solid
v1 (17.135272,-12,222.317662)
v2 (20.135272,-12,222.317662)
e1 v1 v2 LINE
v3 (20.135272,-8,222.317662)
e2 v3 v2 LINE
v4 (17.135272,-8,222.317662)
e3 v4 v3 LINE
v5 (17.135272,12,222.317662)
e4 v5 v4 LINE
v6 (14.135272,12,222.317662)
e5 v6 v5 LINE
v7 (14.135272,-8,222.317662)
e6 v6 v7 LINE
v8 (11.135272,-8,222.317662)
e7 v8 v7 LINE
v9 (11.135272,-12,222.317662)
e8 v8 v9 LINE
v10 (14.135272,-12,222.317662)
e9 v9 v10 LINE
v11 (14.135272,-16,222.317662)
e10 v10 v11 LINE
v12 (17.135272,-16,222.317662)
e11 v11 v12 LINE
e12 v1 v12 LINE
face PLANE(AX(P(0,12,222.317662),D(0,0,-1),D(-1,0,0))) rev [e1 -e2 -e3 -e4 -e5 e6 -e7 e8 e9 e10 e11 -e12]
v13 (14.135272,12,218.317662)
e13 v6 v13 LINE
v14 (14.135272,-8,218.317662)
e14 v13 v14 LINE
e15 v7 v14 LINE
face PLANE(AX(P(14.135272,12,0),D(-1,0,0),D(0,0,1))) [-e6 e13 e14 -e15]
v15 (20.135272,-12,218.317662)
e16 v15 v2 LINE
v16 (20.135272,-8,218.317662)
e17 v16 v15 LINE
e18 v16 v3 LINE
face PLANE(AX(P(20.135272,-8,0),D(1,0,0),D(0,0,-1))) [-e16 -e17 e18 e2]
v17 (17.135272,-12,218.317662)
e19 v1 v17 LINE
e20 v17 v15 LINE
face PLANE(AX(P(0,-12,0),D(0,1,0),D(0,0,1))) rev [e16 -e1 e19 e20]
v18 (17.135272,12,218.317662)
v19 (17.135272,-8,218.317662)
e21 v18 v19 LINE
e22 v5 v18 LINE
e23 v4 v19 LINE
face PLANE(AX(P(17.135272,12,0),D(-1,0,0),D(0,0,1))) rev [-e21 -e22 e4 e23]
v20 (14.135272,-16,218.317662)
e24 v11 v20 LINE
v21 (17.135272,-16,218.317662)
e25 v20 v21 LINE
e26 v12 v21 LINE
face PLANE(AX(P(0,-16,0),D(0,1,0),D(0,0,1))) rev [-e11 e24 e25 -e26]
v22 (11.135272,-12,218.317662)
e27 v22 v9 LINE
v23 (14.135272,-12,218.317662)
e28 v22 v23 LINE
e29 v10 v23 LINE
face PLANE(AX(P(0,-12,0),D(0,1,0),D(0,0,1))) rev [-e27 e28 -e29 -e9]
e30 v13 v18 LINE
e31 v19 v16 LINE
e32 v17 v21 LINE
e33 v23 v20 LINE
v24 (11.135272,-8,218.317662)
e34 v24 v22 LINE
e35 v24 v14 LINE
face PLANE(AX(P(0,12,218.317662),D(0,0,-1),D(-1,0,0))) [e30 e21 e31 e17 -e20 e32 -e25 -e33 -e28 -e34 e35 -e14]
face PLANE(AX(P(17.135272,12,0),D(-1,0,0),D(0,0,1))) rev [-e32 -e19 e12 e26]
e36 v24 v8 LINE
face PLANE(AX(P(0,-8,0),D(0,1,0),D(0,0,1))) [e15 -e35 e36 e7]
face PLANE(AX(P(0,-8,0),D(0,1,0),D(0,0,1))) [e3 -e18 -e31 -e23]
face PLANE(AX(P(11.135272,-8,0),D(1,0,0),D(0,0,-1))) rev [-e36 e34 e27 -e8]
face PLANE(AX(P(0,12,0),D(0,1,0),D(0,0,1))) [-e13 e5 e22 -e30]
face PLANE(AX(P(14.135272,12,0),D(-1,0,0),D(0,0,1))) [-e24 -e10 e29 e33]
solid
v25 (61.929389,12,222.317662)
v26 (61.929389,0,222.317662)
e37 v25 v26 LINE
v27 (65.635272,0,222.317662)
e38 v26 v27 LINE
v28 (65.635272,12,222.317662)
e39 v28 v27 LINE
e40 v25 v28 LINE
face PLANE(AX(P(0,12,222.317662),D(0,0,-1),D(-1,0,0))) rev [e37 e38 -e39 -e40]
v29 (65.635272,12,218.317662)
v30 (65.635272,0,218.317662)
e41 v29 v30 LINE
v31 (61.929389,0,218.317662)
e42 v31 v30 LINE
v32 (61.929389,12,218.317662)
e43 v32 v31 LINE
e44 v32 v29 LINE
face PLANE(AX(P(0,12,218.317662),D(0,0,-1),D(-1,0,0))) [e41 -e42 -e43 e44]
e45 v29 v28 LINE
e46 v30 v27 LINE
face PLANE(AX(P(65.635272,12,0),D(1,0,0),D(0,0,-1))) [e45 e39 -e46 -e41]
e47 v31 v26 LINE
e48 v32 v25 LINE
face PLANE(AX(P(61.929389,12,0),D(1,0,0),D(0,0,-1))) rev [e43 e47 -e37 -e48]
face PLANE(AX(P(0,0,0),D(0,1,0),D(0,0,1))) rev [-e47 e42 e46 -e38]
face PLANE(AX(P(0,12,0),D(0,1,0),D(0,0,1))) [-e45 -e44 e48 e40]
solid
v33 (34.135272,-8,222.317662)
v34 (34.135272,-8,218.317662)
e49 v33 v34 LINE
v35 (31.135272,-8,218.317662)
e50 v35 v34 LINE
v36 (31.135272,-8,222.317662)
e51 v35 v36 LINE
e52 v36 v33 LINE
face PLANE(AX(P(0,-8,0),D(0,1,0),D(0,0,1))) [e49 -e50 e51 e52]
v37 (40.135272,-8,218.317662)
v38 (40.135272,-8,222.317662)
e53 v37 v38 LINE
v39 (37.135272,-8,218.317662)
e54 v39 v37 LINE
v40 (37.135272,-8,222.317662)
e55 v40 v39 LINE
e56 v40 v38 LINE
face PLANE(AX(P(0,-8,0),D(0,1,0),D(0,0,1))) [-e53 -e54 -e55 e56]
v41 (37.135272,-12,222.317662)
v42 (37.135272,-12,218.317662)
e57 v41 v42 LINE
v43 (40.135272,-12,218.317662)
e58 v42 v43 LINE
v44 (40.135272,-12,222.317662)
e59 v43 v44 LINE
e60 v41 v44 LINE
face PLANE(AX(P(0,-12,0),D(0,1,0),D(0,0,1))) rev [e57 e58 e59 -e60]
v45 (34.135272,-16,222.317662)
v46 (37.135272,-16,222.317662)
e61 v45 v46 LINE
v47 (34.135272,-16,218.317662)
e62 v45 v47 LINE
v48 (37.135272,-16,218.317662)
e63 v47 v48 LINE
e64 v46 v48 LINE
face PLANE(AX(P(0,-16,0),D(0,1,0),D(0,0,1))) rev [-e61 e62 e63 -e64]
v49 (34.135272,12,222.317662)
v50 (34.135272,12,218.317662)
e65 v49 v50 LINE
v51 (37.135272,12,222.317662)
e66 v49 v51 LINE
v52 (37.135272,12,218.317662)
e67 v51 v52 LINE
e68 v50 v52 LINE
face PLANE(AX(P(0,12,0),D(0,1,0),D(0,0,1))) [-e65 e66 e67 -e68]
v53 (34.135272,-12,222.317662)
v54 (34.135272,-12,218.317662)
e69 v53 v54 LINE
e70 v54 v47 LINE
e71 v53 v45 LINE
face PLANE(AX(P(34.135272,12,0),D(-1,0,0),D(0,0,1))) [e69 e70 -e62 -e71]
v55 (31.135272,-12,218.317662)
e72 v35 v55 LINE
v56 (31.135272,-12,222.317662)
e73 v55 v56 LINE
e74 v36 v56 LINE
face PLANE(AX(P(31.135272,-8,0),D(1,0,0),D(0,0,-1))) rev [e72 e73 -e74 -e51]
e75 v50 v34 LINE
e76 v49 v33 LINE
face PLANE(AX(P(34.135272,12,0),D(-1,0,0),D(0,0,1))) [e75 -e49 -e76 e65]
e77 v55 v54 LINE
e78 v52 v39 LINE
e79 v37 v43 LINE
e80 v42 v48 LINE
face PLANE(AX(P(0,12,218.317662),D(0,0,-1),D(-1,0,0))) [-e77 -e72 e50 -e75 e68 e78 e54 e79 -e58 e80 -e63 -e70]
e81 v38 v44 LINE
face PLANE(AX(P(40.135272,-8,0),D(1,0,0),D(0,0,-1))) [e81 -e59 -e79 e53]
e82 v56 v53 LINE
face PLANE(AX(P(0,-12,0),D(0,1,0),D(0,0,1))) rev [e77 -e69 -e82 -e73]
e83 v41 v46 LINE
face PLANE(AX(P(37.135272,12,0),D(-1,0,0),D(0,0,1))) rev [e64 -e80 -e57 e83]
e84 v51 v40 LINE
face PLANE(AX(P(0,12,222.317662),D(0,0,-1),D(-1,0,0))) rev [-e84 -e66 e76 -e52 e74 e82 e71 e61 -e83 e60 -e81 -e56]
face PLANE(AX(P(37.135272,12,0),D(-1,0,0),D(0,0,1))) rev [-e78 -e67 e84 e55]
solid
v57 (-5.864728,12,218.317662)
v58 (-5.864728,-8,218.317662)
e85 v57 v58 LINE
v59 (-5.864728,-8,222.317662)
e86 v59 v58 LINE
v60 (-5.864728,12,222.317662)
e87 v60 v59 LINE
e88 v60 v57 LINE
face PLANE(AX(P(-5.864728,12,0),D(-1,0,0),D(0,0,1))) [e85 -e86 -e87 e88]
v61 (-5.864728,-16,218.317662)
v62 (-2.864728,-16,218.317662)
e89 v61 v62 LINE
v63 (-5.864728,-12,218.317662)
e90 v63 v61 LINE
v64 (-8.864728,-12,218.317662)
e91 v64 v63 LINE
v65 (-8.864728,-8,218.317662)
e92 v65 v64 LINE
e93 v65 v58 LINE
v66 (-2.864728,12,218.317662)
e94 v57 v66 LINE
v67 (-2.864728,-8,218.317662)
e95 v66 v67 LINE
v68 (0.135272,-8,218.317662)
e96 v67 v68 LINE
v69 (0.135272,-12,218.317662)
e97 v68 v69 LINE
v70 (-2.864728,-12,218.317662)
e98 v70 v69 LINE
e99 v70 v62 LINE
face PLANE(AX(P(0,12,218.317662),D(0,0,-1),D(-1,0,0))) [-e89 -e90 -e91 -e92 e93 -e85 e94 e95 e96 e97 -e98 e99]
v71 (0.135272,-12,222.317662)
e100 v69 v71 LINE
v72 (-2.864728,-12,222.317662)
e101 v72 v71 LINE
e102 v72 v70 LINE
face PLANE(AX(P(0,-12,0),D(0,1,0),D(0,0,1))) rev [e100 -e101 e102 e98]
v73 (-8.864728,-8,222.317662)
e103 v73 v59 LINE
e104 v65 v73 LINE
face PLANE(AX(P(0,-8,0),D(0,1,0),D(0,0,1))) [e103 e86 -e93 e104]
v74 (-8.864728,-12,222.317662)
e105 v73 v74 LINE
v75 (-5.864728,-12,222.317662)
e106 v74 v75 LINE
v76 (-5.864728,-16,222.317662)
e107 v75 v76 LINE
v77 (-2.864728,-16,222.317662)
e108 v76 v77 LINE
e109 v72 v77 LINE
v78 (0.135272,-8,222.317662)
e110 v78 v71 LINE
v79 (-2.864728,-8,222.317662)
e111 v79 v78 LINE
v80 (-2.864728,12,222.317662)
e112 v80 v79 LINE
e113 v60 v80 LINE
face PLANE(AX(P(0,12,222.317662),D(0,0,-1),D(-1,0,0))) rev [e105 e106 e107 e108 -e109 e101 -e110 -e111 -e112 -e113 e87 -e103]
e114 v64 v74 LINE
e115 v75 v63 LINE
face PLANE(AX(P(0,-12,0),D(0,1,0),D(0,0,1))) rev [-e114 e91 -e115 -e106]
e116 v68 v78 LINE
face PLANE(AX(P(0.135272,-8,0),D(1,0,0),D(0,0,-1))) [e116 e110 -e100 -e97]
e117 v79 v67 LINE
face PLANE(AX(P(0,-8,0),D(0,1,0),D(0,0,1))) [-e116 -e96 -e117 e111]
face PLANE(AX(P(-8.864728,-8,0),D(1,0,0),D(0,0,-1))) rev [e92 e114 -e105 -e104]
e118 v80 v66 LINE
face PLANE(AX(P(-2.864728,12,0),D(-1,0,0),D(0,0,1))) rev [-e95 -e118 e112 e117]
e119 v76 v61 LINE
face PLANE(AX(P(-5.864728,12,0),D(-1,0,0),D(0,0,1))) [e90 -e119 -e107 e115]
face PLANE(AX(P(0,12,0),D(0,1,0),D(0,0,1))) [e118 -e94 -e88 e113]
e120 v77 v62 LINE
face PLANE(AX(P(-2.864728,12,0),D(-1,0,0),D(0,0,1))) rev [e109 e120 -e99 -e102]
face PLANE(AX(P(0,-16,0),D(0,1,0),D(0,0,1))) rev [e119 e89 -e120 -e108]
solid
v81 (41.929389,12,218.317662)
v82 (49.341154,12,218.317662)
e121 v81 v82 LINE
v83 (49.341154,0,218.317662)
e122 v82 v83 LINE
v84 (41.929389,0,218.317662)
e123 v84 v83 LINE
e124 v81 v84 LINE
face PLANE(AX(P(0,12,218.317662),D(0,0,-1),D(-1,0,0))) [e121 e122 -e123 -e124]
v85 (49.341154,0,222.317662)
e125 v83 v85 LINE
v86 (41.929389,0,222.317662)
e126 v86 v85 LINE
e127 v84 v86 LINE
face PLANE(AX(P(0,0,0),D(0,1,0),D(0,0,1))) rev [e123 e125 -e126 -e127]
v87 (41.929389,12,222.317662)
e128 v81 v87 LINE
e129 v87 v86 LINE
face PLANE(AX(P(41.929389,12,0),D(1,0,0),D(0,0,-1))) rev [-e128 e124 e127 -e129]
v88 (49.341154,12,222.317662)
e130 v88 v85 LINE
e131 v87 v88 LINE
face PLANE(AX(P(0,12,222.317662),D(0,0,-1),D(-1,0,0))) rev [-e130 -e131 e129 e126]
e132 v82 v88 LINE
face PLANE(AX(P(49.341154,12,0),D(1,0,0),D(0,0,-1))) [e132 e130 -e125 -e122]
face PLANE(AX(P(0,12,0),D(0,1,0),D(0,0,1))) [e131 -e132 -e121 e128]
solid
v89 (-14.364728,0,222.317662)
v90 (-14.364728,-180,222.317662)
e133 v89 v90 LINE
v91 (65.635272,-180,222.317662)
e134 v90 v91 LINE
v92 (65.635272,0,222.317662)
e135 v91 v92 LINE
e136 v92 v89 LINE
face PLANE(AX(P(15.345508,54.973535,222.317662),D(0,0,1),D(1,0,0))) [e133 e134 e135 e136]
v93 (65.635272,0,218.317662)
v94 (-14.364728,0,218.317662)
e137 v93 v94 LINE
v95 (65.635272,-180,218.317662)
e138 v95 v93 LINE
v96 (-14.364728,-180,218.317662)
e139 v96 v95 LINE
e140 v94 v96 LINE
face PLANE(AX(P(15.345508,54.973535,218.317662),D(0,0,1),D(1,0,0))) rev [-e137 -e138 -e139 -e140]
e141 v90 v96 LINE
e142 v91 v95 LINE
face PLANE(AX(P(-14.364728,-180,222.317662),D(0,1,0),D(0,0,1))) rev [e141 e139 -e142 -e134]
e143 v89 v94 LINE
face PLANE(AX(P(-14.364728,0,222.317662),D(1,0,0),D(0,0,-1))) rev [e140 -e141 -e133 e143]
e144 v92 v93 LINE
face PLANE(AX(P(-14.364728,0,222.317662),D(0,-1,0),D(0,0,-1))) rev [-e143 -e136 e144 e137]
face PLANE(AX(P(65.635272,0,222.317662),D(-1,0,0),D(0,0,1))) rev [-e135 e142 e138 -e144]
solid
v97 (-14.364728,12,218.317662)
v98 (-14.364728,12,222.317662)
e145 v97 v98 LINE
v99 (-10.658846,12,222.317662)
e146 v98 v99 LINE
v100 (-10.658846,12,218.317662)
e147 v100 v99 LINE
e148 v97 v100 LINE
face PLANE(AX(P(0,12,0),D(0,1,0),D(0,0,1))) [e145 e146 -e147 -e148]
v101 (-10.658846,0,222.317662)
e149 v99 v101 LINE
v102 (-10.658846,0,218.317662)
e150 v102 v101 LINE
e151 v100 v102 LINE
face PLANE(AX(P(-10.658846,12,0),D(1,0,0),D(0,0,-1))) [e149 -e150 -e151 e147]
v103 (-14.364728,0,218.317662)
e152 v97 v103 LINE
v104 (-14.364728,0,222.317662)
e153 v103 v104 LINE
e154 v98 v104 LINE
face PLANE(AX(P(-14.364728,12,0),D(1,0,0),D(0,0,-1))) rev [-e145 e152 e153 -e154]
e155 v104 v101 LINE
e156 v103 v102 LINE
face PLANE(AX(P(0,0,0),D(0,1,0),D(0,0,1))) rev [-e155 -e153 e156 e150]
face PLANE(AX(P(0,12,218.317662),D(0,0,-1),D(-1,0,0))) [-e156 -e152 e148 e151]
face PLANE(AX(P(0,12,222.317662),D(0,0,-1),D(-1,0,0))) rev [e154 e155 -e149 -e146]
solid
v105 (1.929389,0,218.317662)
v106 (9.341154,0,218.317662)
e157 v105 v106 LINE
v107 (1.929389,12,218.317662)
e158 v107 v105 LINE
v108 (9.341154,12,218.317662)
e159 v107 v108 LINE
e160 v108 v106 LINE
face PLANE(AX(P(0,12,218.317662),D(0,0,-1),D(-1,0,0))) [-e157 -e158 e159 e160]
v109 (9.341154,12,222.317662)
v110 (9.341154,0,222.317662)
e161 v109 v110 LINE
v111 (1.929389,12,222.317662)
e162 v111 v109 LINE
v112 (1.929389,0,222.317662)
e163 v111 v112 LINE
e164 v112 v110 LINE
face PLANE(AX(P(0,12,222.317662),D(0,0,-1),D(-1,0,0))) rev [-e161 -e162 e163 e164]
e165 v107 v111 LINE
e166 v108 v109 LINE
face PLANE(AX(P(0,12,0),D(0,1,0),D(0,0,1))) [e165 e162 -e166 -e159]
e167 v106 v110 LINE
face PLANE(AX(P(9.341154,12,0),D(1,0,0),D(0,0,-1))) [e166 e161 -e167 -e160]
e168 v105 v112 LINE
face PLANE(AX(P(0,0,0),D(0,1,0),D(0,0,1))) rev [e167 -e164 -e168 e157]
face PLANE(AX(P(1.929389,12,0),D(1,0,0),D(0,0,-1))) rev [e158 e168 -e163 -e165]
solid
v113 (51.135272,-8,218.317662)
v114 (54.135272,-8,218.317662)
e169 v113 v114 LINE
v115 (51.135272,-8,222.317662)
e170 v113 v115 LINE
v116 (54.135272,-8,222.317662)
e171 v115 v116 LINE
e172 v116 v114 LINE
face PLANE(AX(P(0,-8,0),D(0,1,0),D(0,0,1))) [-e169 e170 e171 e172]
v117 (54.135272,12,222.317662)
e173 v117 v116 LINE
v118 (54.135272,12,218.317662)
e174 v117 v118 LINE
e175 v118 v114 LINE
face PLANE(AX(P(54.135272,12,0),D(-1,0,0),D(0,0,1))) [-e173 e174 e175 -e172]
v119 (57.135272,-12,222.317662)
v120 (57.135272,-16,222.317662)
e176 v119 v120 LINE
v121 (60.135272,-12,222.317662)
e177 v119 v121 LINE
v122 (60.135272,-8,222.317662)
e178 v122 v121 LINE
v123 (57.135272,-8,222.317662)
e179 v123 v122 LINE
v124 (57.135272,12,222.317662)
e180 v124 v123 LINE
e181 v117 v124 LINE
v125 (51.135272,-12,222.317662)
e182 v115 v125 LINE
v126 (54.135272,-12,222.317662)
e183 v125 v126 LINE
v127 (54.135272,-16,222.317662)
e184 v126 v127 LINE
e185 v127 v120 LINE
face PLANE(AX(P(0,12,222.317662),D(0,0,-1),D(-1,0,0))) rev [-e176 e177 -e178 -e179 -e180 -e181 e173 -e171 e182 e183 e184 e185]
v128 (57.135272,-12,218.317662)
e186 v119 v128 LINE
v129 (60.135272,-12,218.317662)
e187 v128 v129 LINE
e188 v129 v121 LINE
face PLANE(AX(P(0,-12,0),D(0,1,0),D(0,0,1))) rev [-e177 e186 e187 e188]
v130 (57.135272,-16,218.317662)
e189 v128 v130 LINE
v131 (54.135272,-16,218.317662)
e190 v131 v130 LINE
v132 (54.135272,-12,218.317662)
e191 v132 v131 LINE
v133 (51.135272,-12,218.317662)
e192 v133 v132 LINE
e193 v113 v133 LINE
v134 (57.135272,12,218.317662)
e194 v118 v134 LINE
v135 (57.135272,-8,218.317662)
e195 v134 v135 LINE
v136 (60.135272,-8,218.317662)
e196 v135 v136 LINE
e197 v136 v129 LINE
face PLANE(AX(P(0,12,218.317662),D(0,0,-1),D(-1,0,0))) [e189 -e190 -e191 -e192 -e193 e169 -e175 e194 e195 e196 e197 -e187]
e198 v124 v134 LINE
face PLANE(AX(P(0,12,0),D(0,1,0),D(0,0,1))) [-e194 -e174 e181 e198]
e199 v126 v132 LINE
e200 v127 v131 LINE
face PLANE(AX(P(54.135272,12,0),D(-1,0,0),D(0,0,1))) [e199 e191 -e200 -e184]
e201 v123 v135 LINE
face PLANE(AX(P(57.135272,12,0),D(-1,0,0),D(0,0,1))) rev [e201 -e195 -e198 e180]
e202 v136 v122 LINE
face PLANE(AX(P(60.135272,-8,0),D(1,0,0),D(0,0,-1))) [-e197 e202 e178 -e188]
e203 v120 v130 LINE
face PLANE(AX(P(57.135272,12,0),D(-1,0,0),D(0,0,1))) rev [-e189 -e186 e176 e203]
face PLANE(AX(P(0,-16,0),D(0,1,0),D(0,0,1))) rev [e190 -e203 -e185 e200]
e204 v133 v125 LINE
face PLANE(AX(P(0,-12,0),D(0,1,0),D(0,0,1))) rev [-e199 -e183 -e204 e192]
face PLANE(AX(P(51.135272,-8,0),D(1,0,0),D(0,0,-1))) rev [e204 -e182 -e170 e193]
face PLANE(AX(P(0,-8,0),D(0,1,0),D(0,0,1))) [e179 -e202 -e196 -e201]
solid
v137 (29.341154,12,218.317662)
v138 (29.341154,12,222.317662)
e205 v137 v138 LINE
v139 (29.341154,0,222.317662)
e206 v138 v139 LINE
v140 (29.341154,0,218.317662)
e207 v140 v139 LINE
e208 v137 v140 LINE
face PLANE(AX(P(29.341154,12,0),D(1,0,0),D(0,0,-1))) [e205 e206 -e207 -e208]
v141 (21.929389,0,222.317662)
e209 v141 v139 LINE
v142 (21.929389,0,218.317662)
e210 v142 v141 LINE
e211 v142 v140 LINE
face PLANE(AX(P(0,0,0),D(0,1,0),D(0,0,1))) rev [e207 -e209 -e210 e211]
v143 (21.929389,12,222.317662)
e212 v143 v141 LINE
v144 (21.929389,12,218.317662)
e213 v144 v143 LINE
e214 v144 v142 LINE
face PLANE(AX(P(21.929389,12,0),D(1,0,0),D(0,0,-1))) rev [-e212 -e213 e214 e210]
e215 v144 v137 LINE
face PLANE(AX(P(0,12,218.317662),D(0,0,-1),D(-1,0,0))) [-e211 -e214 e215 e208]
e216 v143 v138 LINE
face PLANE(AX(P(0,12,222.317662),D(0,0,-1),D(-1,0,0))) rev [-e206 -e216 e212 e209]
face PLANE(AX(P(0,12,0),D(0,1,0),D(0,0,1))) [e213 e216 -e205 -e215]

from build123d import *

# Parameters (mm, degrees)
SKETCH3_W             = 3.705882353
SKETCH3_H             = 4
BOSS_EXTRUDE2_DEPTH   = 12
SKETCH3_W_2           = 3
BOSS_EXTRUDE2_2_DEPTH = 12
SKETCH3_W_3           = 7.411764706
BOSS_EXTRUDE2_3_DEPTH = 12
BOSS_EXTRUDE2_4_DEPTH = 12
BOSS_EXTRUDE2_5_DEPTH = 12
BOSS_EXTRUDE2_6_DEPTH = 12
BOSS_EXTRUDE2_7_DEPTH = 12
BOSS_EXTRUDE2_8_DEPTH = 12
BOSS_EXTRUDE2_9_DEPTH = 12
SKETCH3_6_W           = 3
SKETCH3_6_H           = 4
BOSS_EXTRUDE4_DEPTH   = 16
BOSS_EXTRUDE5_START   = -12
SKETCH3_7_W           = 3
SKETCH3_7_H           = 4
BOSS_EXTRUDE5_DEPTH   = 4
SKETCH4_W             = 80
SKETCH4_H             = 180
BOSS_EXTRUDE6_DEPTH   = 4


with BuildPart() as part:
    # Sketch3 → Boss-Extrude2 (new body)
    with BuildSketch(Plane(origin=(0, 0, 0), x_dir=(1, 0, 0), z_dir=(0, 1, 0))):
        with Locations((-12.511786974, -220.31766228)):
            Rectangle(SKETCH3_W, SKETCH3_H)
    extrude(amount=BOSS_EXTRUDE2_DEPTH)


with BuildPart() as body_2:
    # Sketch3 → Boss-Extrude2 2 (new body)
    with BuildSketch(Plane(origin=(0, 0, 0), x_dir=(1, 0, 0), z_dir=(0, 1, 0))):
        with Locations((-4.36472815, -220.31766228)):
            Rectangle(SKETCH3_W_2, SKETCH3_H)
    extrude(amount=BOSS_EXTRUDE2_2_DEPTH)



with BuildPart() as body_3:
    # Sketch3 → Boss-Extrude2 3 (new body)
    with BuildSketch(Plane(origin=(0, 0, 0), x_dir=(1, 0, 0), z_dir=(0, 1, 0))):
        with Locations((5.63527185, -220.31766228)):
            Rectangle(SKETCH3_W_3, SKETCH3_H)
    extrude(amount=BOSS_EXTRUDE2_3_DEPTH)


with BuildPart() as body_4:
    # Sketch3 → Boss-Extrude2 4 (new body)
    with BuildSketch(Plane(origin=(0, 0, 0), x_dir=(1, 0, 0), z_dir=(0, 1, 0))):
        with Locations((15.63527185, -220.31766228)):
            Rectangle(SKETCH3_W_2, SKETCH3_H)
    extrude(amount=BOSS_EXTRUDE2_4_DEPTH)


with BuildPart() as body_5:
    # Sketch3 → Boss-Extrude2 5 (new body)
    with BuildSketch(Plane(origin=(0, 0, 0), x_dir=(1, 0, 0), z_dir=(0, 1, 0))):
        with Locations((25.63527185, -220.31766228)):
            Rectangle(SKETCH3_W_3, SKETCH3_H)
    extrude(amount=BOSS_EXTRUDE2_5_DEPTH)


with BuildPart() as body_6:
    # Sketch3 → Boss-Extrude2 6 (new body)
    with BuildSketch(Plane(origin=(0, 0, 0), x_dir=(1, 0, 0), z_dir=(0, 1, 0))):
        with Locations((35.63527185, -220.31766228)):
            Rectangle(SKETCH3_W_2, SKETCH3_H)
    extrude(amount=BOSS_EXTRUDE2_6_DEPTH)


with BuildPart() as body_7:
    # Sketch3 → Boss-Extrude2 7 (new body)
    with BuildSketch(Plane(origin=(0, 0, 0), x_dir=(1, 0, 0), z_dir=(0, 1, 0))):
        with Locations((45.63527185, -220.31766228)):
            Rectangle(SKETCH3_W_3, SKETCH3_H)
    extrude(amount=BOSS_EXTRUDE2_7_DEPTH)


with BuildPart() as body_8:
    # Sketch3 → Boss-Extrude2 8 (new body)
    with BuildSketch(Plane(origin=(0, 0, 0), x_dir=(1, 0, 0), z_dir=(0, 1, 0))):
        with Locations((55.63527185, -220.31766228)):
            Rectangle(SKETCH3_W_2, SKETCH3_H)
    extrude(amount=BOSS_EXTRUDE2_8_DEPTH)


with BuildPart() as body_9:
    # Sketch3 → Boss-Extrude2 9 (new body)
    with BuildSketch(Plane(origin=(0, 0, 0), x_dir=(1, 0, 0), z_dir=(0, 1, 0))):
        with Locations((63.782330674, -220.31766228)):
            Rectangle(SKETCH3_W, SKETCH3_H)
    extrude(amount=BOSS_EXTRUDE2_9_DEPTH)


with BuildPart() as body_2_1:
    add(body_2.part)

    add(body_4.part)  # Boss-Extrude4 merges body 4

    add(body_6.part)  # Boss-Extrude4 merges body 6

    add(body_8.part)  # Boss-Extrude4 merges body 8
    # Sketch3<6> → Boss-Extrude4 (add)
    with BuildSketch(Plane(origin=(0, 0, 0), x_dir=(1, 0, 0), z_dir=(0, 1, 0))):
        with Locations((-4.36472815, -220.31766228)):
            Rectangle(SKETCH3_6_W, SKETCH3_6_H)
        with Locations((15.63527185, -220.31766228)):
            Rectangle(SKETCH3_6_W, SKETCH3_6_H)
        with Locations((35.63527185, -220.31766228)):
            Rectangle(SKETCH3_6_W, SKETCH3_6_H)
        with Locations((55.63527185, -220.31766228)):
            Rectangle(SKETCH3_6_W, SKETCH3_6_H)
    extrude(amount=-BOSS_EXTRUDE4_DEPTH)

    # Sketch3<7> → Boss-Extrude5 (add)
    with BuildSketch(Plane(origin=(0, 0, 0), x_dir=(1, 0, 0), z_dir=(0, 1, 0)).offset(BOSS_EXTRUDE5_START)):
        with Locations((-7.36472815, -220.31766228)):
            Rectangle(SKETCH3_7_W, SKETCH3_7_H)
        with Locations((-1.36472815, -220.31766228)):
            Rectangle(SKETCH3_7_W, SKETCH3_7_H)
        with Locations((12.63527185, -220.31766228)):
            Rectangle(SKETCH3_7_W, SKETCH3_7_H)
        with Locations((18.63527185, -220.31766228)):
            Rectangle(SKETCH3_7_W, SKETCH3_7_H)
        with Locations((32.63527185, -220.31766228)):
            Rectangle(SKETCH3_7_W, SKETCH3_7_H)
        with Locations((38.63527185, -220.31766228)):
            Rectangle(SKETCH3_7_W, SKETCH3_7_H)
        with Locations((52.63527185, -220.31766228)):
            Rectangle(SKETCH3_7_W, SKETCH3_7_H)
        with Locations((58.63527185, -220.31766228)):
            Rectangle(SKETCH3_7_W, SKETCH3_7_H)
    extrude(amount=BOSS_EXTRUDE5_DEPTH)


with BuildPart() as body_7_2:
    # Sketch4 → Boss-Extrude6 (new body)
    with BuildSketch(Plane.XY):
        with Locations((10.2897637, -144.973534825)):
            Rectangle(SKETCH4_W, SKETCH4_H)
    extrude(amount=BOSS_EXTRUDE6_DEPTH)


with BuildPart() as body_7_2_1:
    # Body-Move/Copy1: read off the stored shape, not the designer's step
    # Body-Move/Copy1: moved
    add(body_7_2.part.moved(Location((15.3455082, 54.9735348, 218.3176623))))


solid = Compound([part.part, body_3.part, body_5.part, body_7.part, body_9.part, body_2_1.part, body_7_2_1.part])
